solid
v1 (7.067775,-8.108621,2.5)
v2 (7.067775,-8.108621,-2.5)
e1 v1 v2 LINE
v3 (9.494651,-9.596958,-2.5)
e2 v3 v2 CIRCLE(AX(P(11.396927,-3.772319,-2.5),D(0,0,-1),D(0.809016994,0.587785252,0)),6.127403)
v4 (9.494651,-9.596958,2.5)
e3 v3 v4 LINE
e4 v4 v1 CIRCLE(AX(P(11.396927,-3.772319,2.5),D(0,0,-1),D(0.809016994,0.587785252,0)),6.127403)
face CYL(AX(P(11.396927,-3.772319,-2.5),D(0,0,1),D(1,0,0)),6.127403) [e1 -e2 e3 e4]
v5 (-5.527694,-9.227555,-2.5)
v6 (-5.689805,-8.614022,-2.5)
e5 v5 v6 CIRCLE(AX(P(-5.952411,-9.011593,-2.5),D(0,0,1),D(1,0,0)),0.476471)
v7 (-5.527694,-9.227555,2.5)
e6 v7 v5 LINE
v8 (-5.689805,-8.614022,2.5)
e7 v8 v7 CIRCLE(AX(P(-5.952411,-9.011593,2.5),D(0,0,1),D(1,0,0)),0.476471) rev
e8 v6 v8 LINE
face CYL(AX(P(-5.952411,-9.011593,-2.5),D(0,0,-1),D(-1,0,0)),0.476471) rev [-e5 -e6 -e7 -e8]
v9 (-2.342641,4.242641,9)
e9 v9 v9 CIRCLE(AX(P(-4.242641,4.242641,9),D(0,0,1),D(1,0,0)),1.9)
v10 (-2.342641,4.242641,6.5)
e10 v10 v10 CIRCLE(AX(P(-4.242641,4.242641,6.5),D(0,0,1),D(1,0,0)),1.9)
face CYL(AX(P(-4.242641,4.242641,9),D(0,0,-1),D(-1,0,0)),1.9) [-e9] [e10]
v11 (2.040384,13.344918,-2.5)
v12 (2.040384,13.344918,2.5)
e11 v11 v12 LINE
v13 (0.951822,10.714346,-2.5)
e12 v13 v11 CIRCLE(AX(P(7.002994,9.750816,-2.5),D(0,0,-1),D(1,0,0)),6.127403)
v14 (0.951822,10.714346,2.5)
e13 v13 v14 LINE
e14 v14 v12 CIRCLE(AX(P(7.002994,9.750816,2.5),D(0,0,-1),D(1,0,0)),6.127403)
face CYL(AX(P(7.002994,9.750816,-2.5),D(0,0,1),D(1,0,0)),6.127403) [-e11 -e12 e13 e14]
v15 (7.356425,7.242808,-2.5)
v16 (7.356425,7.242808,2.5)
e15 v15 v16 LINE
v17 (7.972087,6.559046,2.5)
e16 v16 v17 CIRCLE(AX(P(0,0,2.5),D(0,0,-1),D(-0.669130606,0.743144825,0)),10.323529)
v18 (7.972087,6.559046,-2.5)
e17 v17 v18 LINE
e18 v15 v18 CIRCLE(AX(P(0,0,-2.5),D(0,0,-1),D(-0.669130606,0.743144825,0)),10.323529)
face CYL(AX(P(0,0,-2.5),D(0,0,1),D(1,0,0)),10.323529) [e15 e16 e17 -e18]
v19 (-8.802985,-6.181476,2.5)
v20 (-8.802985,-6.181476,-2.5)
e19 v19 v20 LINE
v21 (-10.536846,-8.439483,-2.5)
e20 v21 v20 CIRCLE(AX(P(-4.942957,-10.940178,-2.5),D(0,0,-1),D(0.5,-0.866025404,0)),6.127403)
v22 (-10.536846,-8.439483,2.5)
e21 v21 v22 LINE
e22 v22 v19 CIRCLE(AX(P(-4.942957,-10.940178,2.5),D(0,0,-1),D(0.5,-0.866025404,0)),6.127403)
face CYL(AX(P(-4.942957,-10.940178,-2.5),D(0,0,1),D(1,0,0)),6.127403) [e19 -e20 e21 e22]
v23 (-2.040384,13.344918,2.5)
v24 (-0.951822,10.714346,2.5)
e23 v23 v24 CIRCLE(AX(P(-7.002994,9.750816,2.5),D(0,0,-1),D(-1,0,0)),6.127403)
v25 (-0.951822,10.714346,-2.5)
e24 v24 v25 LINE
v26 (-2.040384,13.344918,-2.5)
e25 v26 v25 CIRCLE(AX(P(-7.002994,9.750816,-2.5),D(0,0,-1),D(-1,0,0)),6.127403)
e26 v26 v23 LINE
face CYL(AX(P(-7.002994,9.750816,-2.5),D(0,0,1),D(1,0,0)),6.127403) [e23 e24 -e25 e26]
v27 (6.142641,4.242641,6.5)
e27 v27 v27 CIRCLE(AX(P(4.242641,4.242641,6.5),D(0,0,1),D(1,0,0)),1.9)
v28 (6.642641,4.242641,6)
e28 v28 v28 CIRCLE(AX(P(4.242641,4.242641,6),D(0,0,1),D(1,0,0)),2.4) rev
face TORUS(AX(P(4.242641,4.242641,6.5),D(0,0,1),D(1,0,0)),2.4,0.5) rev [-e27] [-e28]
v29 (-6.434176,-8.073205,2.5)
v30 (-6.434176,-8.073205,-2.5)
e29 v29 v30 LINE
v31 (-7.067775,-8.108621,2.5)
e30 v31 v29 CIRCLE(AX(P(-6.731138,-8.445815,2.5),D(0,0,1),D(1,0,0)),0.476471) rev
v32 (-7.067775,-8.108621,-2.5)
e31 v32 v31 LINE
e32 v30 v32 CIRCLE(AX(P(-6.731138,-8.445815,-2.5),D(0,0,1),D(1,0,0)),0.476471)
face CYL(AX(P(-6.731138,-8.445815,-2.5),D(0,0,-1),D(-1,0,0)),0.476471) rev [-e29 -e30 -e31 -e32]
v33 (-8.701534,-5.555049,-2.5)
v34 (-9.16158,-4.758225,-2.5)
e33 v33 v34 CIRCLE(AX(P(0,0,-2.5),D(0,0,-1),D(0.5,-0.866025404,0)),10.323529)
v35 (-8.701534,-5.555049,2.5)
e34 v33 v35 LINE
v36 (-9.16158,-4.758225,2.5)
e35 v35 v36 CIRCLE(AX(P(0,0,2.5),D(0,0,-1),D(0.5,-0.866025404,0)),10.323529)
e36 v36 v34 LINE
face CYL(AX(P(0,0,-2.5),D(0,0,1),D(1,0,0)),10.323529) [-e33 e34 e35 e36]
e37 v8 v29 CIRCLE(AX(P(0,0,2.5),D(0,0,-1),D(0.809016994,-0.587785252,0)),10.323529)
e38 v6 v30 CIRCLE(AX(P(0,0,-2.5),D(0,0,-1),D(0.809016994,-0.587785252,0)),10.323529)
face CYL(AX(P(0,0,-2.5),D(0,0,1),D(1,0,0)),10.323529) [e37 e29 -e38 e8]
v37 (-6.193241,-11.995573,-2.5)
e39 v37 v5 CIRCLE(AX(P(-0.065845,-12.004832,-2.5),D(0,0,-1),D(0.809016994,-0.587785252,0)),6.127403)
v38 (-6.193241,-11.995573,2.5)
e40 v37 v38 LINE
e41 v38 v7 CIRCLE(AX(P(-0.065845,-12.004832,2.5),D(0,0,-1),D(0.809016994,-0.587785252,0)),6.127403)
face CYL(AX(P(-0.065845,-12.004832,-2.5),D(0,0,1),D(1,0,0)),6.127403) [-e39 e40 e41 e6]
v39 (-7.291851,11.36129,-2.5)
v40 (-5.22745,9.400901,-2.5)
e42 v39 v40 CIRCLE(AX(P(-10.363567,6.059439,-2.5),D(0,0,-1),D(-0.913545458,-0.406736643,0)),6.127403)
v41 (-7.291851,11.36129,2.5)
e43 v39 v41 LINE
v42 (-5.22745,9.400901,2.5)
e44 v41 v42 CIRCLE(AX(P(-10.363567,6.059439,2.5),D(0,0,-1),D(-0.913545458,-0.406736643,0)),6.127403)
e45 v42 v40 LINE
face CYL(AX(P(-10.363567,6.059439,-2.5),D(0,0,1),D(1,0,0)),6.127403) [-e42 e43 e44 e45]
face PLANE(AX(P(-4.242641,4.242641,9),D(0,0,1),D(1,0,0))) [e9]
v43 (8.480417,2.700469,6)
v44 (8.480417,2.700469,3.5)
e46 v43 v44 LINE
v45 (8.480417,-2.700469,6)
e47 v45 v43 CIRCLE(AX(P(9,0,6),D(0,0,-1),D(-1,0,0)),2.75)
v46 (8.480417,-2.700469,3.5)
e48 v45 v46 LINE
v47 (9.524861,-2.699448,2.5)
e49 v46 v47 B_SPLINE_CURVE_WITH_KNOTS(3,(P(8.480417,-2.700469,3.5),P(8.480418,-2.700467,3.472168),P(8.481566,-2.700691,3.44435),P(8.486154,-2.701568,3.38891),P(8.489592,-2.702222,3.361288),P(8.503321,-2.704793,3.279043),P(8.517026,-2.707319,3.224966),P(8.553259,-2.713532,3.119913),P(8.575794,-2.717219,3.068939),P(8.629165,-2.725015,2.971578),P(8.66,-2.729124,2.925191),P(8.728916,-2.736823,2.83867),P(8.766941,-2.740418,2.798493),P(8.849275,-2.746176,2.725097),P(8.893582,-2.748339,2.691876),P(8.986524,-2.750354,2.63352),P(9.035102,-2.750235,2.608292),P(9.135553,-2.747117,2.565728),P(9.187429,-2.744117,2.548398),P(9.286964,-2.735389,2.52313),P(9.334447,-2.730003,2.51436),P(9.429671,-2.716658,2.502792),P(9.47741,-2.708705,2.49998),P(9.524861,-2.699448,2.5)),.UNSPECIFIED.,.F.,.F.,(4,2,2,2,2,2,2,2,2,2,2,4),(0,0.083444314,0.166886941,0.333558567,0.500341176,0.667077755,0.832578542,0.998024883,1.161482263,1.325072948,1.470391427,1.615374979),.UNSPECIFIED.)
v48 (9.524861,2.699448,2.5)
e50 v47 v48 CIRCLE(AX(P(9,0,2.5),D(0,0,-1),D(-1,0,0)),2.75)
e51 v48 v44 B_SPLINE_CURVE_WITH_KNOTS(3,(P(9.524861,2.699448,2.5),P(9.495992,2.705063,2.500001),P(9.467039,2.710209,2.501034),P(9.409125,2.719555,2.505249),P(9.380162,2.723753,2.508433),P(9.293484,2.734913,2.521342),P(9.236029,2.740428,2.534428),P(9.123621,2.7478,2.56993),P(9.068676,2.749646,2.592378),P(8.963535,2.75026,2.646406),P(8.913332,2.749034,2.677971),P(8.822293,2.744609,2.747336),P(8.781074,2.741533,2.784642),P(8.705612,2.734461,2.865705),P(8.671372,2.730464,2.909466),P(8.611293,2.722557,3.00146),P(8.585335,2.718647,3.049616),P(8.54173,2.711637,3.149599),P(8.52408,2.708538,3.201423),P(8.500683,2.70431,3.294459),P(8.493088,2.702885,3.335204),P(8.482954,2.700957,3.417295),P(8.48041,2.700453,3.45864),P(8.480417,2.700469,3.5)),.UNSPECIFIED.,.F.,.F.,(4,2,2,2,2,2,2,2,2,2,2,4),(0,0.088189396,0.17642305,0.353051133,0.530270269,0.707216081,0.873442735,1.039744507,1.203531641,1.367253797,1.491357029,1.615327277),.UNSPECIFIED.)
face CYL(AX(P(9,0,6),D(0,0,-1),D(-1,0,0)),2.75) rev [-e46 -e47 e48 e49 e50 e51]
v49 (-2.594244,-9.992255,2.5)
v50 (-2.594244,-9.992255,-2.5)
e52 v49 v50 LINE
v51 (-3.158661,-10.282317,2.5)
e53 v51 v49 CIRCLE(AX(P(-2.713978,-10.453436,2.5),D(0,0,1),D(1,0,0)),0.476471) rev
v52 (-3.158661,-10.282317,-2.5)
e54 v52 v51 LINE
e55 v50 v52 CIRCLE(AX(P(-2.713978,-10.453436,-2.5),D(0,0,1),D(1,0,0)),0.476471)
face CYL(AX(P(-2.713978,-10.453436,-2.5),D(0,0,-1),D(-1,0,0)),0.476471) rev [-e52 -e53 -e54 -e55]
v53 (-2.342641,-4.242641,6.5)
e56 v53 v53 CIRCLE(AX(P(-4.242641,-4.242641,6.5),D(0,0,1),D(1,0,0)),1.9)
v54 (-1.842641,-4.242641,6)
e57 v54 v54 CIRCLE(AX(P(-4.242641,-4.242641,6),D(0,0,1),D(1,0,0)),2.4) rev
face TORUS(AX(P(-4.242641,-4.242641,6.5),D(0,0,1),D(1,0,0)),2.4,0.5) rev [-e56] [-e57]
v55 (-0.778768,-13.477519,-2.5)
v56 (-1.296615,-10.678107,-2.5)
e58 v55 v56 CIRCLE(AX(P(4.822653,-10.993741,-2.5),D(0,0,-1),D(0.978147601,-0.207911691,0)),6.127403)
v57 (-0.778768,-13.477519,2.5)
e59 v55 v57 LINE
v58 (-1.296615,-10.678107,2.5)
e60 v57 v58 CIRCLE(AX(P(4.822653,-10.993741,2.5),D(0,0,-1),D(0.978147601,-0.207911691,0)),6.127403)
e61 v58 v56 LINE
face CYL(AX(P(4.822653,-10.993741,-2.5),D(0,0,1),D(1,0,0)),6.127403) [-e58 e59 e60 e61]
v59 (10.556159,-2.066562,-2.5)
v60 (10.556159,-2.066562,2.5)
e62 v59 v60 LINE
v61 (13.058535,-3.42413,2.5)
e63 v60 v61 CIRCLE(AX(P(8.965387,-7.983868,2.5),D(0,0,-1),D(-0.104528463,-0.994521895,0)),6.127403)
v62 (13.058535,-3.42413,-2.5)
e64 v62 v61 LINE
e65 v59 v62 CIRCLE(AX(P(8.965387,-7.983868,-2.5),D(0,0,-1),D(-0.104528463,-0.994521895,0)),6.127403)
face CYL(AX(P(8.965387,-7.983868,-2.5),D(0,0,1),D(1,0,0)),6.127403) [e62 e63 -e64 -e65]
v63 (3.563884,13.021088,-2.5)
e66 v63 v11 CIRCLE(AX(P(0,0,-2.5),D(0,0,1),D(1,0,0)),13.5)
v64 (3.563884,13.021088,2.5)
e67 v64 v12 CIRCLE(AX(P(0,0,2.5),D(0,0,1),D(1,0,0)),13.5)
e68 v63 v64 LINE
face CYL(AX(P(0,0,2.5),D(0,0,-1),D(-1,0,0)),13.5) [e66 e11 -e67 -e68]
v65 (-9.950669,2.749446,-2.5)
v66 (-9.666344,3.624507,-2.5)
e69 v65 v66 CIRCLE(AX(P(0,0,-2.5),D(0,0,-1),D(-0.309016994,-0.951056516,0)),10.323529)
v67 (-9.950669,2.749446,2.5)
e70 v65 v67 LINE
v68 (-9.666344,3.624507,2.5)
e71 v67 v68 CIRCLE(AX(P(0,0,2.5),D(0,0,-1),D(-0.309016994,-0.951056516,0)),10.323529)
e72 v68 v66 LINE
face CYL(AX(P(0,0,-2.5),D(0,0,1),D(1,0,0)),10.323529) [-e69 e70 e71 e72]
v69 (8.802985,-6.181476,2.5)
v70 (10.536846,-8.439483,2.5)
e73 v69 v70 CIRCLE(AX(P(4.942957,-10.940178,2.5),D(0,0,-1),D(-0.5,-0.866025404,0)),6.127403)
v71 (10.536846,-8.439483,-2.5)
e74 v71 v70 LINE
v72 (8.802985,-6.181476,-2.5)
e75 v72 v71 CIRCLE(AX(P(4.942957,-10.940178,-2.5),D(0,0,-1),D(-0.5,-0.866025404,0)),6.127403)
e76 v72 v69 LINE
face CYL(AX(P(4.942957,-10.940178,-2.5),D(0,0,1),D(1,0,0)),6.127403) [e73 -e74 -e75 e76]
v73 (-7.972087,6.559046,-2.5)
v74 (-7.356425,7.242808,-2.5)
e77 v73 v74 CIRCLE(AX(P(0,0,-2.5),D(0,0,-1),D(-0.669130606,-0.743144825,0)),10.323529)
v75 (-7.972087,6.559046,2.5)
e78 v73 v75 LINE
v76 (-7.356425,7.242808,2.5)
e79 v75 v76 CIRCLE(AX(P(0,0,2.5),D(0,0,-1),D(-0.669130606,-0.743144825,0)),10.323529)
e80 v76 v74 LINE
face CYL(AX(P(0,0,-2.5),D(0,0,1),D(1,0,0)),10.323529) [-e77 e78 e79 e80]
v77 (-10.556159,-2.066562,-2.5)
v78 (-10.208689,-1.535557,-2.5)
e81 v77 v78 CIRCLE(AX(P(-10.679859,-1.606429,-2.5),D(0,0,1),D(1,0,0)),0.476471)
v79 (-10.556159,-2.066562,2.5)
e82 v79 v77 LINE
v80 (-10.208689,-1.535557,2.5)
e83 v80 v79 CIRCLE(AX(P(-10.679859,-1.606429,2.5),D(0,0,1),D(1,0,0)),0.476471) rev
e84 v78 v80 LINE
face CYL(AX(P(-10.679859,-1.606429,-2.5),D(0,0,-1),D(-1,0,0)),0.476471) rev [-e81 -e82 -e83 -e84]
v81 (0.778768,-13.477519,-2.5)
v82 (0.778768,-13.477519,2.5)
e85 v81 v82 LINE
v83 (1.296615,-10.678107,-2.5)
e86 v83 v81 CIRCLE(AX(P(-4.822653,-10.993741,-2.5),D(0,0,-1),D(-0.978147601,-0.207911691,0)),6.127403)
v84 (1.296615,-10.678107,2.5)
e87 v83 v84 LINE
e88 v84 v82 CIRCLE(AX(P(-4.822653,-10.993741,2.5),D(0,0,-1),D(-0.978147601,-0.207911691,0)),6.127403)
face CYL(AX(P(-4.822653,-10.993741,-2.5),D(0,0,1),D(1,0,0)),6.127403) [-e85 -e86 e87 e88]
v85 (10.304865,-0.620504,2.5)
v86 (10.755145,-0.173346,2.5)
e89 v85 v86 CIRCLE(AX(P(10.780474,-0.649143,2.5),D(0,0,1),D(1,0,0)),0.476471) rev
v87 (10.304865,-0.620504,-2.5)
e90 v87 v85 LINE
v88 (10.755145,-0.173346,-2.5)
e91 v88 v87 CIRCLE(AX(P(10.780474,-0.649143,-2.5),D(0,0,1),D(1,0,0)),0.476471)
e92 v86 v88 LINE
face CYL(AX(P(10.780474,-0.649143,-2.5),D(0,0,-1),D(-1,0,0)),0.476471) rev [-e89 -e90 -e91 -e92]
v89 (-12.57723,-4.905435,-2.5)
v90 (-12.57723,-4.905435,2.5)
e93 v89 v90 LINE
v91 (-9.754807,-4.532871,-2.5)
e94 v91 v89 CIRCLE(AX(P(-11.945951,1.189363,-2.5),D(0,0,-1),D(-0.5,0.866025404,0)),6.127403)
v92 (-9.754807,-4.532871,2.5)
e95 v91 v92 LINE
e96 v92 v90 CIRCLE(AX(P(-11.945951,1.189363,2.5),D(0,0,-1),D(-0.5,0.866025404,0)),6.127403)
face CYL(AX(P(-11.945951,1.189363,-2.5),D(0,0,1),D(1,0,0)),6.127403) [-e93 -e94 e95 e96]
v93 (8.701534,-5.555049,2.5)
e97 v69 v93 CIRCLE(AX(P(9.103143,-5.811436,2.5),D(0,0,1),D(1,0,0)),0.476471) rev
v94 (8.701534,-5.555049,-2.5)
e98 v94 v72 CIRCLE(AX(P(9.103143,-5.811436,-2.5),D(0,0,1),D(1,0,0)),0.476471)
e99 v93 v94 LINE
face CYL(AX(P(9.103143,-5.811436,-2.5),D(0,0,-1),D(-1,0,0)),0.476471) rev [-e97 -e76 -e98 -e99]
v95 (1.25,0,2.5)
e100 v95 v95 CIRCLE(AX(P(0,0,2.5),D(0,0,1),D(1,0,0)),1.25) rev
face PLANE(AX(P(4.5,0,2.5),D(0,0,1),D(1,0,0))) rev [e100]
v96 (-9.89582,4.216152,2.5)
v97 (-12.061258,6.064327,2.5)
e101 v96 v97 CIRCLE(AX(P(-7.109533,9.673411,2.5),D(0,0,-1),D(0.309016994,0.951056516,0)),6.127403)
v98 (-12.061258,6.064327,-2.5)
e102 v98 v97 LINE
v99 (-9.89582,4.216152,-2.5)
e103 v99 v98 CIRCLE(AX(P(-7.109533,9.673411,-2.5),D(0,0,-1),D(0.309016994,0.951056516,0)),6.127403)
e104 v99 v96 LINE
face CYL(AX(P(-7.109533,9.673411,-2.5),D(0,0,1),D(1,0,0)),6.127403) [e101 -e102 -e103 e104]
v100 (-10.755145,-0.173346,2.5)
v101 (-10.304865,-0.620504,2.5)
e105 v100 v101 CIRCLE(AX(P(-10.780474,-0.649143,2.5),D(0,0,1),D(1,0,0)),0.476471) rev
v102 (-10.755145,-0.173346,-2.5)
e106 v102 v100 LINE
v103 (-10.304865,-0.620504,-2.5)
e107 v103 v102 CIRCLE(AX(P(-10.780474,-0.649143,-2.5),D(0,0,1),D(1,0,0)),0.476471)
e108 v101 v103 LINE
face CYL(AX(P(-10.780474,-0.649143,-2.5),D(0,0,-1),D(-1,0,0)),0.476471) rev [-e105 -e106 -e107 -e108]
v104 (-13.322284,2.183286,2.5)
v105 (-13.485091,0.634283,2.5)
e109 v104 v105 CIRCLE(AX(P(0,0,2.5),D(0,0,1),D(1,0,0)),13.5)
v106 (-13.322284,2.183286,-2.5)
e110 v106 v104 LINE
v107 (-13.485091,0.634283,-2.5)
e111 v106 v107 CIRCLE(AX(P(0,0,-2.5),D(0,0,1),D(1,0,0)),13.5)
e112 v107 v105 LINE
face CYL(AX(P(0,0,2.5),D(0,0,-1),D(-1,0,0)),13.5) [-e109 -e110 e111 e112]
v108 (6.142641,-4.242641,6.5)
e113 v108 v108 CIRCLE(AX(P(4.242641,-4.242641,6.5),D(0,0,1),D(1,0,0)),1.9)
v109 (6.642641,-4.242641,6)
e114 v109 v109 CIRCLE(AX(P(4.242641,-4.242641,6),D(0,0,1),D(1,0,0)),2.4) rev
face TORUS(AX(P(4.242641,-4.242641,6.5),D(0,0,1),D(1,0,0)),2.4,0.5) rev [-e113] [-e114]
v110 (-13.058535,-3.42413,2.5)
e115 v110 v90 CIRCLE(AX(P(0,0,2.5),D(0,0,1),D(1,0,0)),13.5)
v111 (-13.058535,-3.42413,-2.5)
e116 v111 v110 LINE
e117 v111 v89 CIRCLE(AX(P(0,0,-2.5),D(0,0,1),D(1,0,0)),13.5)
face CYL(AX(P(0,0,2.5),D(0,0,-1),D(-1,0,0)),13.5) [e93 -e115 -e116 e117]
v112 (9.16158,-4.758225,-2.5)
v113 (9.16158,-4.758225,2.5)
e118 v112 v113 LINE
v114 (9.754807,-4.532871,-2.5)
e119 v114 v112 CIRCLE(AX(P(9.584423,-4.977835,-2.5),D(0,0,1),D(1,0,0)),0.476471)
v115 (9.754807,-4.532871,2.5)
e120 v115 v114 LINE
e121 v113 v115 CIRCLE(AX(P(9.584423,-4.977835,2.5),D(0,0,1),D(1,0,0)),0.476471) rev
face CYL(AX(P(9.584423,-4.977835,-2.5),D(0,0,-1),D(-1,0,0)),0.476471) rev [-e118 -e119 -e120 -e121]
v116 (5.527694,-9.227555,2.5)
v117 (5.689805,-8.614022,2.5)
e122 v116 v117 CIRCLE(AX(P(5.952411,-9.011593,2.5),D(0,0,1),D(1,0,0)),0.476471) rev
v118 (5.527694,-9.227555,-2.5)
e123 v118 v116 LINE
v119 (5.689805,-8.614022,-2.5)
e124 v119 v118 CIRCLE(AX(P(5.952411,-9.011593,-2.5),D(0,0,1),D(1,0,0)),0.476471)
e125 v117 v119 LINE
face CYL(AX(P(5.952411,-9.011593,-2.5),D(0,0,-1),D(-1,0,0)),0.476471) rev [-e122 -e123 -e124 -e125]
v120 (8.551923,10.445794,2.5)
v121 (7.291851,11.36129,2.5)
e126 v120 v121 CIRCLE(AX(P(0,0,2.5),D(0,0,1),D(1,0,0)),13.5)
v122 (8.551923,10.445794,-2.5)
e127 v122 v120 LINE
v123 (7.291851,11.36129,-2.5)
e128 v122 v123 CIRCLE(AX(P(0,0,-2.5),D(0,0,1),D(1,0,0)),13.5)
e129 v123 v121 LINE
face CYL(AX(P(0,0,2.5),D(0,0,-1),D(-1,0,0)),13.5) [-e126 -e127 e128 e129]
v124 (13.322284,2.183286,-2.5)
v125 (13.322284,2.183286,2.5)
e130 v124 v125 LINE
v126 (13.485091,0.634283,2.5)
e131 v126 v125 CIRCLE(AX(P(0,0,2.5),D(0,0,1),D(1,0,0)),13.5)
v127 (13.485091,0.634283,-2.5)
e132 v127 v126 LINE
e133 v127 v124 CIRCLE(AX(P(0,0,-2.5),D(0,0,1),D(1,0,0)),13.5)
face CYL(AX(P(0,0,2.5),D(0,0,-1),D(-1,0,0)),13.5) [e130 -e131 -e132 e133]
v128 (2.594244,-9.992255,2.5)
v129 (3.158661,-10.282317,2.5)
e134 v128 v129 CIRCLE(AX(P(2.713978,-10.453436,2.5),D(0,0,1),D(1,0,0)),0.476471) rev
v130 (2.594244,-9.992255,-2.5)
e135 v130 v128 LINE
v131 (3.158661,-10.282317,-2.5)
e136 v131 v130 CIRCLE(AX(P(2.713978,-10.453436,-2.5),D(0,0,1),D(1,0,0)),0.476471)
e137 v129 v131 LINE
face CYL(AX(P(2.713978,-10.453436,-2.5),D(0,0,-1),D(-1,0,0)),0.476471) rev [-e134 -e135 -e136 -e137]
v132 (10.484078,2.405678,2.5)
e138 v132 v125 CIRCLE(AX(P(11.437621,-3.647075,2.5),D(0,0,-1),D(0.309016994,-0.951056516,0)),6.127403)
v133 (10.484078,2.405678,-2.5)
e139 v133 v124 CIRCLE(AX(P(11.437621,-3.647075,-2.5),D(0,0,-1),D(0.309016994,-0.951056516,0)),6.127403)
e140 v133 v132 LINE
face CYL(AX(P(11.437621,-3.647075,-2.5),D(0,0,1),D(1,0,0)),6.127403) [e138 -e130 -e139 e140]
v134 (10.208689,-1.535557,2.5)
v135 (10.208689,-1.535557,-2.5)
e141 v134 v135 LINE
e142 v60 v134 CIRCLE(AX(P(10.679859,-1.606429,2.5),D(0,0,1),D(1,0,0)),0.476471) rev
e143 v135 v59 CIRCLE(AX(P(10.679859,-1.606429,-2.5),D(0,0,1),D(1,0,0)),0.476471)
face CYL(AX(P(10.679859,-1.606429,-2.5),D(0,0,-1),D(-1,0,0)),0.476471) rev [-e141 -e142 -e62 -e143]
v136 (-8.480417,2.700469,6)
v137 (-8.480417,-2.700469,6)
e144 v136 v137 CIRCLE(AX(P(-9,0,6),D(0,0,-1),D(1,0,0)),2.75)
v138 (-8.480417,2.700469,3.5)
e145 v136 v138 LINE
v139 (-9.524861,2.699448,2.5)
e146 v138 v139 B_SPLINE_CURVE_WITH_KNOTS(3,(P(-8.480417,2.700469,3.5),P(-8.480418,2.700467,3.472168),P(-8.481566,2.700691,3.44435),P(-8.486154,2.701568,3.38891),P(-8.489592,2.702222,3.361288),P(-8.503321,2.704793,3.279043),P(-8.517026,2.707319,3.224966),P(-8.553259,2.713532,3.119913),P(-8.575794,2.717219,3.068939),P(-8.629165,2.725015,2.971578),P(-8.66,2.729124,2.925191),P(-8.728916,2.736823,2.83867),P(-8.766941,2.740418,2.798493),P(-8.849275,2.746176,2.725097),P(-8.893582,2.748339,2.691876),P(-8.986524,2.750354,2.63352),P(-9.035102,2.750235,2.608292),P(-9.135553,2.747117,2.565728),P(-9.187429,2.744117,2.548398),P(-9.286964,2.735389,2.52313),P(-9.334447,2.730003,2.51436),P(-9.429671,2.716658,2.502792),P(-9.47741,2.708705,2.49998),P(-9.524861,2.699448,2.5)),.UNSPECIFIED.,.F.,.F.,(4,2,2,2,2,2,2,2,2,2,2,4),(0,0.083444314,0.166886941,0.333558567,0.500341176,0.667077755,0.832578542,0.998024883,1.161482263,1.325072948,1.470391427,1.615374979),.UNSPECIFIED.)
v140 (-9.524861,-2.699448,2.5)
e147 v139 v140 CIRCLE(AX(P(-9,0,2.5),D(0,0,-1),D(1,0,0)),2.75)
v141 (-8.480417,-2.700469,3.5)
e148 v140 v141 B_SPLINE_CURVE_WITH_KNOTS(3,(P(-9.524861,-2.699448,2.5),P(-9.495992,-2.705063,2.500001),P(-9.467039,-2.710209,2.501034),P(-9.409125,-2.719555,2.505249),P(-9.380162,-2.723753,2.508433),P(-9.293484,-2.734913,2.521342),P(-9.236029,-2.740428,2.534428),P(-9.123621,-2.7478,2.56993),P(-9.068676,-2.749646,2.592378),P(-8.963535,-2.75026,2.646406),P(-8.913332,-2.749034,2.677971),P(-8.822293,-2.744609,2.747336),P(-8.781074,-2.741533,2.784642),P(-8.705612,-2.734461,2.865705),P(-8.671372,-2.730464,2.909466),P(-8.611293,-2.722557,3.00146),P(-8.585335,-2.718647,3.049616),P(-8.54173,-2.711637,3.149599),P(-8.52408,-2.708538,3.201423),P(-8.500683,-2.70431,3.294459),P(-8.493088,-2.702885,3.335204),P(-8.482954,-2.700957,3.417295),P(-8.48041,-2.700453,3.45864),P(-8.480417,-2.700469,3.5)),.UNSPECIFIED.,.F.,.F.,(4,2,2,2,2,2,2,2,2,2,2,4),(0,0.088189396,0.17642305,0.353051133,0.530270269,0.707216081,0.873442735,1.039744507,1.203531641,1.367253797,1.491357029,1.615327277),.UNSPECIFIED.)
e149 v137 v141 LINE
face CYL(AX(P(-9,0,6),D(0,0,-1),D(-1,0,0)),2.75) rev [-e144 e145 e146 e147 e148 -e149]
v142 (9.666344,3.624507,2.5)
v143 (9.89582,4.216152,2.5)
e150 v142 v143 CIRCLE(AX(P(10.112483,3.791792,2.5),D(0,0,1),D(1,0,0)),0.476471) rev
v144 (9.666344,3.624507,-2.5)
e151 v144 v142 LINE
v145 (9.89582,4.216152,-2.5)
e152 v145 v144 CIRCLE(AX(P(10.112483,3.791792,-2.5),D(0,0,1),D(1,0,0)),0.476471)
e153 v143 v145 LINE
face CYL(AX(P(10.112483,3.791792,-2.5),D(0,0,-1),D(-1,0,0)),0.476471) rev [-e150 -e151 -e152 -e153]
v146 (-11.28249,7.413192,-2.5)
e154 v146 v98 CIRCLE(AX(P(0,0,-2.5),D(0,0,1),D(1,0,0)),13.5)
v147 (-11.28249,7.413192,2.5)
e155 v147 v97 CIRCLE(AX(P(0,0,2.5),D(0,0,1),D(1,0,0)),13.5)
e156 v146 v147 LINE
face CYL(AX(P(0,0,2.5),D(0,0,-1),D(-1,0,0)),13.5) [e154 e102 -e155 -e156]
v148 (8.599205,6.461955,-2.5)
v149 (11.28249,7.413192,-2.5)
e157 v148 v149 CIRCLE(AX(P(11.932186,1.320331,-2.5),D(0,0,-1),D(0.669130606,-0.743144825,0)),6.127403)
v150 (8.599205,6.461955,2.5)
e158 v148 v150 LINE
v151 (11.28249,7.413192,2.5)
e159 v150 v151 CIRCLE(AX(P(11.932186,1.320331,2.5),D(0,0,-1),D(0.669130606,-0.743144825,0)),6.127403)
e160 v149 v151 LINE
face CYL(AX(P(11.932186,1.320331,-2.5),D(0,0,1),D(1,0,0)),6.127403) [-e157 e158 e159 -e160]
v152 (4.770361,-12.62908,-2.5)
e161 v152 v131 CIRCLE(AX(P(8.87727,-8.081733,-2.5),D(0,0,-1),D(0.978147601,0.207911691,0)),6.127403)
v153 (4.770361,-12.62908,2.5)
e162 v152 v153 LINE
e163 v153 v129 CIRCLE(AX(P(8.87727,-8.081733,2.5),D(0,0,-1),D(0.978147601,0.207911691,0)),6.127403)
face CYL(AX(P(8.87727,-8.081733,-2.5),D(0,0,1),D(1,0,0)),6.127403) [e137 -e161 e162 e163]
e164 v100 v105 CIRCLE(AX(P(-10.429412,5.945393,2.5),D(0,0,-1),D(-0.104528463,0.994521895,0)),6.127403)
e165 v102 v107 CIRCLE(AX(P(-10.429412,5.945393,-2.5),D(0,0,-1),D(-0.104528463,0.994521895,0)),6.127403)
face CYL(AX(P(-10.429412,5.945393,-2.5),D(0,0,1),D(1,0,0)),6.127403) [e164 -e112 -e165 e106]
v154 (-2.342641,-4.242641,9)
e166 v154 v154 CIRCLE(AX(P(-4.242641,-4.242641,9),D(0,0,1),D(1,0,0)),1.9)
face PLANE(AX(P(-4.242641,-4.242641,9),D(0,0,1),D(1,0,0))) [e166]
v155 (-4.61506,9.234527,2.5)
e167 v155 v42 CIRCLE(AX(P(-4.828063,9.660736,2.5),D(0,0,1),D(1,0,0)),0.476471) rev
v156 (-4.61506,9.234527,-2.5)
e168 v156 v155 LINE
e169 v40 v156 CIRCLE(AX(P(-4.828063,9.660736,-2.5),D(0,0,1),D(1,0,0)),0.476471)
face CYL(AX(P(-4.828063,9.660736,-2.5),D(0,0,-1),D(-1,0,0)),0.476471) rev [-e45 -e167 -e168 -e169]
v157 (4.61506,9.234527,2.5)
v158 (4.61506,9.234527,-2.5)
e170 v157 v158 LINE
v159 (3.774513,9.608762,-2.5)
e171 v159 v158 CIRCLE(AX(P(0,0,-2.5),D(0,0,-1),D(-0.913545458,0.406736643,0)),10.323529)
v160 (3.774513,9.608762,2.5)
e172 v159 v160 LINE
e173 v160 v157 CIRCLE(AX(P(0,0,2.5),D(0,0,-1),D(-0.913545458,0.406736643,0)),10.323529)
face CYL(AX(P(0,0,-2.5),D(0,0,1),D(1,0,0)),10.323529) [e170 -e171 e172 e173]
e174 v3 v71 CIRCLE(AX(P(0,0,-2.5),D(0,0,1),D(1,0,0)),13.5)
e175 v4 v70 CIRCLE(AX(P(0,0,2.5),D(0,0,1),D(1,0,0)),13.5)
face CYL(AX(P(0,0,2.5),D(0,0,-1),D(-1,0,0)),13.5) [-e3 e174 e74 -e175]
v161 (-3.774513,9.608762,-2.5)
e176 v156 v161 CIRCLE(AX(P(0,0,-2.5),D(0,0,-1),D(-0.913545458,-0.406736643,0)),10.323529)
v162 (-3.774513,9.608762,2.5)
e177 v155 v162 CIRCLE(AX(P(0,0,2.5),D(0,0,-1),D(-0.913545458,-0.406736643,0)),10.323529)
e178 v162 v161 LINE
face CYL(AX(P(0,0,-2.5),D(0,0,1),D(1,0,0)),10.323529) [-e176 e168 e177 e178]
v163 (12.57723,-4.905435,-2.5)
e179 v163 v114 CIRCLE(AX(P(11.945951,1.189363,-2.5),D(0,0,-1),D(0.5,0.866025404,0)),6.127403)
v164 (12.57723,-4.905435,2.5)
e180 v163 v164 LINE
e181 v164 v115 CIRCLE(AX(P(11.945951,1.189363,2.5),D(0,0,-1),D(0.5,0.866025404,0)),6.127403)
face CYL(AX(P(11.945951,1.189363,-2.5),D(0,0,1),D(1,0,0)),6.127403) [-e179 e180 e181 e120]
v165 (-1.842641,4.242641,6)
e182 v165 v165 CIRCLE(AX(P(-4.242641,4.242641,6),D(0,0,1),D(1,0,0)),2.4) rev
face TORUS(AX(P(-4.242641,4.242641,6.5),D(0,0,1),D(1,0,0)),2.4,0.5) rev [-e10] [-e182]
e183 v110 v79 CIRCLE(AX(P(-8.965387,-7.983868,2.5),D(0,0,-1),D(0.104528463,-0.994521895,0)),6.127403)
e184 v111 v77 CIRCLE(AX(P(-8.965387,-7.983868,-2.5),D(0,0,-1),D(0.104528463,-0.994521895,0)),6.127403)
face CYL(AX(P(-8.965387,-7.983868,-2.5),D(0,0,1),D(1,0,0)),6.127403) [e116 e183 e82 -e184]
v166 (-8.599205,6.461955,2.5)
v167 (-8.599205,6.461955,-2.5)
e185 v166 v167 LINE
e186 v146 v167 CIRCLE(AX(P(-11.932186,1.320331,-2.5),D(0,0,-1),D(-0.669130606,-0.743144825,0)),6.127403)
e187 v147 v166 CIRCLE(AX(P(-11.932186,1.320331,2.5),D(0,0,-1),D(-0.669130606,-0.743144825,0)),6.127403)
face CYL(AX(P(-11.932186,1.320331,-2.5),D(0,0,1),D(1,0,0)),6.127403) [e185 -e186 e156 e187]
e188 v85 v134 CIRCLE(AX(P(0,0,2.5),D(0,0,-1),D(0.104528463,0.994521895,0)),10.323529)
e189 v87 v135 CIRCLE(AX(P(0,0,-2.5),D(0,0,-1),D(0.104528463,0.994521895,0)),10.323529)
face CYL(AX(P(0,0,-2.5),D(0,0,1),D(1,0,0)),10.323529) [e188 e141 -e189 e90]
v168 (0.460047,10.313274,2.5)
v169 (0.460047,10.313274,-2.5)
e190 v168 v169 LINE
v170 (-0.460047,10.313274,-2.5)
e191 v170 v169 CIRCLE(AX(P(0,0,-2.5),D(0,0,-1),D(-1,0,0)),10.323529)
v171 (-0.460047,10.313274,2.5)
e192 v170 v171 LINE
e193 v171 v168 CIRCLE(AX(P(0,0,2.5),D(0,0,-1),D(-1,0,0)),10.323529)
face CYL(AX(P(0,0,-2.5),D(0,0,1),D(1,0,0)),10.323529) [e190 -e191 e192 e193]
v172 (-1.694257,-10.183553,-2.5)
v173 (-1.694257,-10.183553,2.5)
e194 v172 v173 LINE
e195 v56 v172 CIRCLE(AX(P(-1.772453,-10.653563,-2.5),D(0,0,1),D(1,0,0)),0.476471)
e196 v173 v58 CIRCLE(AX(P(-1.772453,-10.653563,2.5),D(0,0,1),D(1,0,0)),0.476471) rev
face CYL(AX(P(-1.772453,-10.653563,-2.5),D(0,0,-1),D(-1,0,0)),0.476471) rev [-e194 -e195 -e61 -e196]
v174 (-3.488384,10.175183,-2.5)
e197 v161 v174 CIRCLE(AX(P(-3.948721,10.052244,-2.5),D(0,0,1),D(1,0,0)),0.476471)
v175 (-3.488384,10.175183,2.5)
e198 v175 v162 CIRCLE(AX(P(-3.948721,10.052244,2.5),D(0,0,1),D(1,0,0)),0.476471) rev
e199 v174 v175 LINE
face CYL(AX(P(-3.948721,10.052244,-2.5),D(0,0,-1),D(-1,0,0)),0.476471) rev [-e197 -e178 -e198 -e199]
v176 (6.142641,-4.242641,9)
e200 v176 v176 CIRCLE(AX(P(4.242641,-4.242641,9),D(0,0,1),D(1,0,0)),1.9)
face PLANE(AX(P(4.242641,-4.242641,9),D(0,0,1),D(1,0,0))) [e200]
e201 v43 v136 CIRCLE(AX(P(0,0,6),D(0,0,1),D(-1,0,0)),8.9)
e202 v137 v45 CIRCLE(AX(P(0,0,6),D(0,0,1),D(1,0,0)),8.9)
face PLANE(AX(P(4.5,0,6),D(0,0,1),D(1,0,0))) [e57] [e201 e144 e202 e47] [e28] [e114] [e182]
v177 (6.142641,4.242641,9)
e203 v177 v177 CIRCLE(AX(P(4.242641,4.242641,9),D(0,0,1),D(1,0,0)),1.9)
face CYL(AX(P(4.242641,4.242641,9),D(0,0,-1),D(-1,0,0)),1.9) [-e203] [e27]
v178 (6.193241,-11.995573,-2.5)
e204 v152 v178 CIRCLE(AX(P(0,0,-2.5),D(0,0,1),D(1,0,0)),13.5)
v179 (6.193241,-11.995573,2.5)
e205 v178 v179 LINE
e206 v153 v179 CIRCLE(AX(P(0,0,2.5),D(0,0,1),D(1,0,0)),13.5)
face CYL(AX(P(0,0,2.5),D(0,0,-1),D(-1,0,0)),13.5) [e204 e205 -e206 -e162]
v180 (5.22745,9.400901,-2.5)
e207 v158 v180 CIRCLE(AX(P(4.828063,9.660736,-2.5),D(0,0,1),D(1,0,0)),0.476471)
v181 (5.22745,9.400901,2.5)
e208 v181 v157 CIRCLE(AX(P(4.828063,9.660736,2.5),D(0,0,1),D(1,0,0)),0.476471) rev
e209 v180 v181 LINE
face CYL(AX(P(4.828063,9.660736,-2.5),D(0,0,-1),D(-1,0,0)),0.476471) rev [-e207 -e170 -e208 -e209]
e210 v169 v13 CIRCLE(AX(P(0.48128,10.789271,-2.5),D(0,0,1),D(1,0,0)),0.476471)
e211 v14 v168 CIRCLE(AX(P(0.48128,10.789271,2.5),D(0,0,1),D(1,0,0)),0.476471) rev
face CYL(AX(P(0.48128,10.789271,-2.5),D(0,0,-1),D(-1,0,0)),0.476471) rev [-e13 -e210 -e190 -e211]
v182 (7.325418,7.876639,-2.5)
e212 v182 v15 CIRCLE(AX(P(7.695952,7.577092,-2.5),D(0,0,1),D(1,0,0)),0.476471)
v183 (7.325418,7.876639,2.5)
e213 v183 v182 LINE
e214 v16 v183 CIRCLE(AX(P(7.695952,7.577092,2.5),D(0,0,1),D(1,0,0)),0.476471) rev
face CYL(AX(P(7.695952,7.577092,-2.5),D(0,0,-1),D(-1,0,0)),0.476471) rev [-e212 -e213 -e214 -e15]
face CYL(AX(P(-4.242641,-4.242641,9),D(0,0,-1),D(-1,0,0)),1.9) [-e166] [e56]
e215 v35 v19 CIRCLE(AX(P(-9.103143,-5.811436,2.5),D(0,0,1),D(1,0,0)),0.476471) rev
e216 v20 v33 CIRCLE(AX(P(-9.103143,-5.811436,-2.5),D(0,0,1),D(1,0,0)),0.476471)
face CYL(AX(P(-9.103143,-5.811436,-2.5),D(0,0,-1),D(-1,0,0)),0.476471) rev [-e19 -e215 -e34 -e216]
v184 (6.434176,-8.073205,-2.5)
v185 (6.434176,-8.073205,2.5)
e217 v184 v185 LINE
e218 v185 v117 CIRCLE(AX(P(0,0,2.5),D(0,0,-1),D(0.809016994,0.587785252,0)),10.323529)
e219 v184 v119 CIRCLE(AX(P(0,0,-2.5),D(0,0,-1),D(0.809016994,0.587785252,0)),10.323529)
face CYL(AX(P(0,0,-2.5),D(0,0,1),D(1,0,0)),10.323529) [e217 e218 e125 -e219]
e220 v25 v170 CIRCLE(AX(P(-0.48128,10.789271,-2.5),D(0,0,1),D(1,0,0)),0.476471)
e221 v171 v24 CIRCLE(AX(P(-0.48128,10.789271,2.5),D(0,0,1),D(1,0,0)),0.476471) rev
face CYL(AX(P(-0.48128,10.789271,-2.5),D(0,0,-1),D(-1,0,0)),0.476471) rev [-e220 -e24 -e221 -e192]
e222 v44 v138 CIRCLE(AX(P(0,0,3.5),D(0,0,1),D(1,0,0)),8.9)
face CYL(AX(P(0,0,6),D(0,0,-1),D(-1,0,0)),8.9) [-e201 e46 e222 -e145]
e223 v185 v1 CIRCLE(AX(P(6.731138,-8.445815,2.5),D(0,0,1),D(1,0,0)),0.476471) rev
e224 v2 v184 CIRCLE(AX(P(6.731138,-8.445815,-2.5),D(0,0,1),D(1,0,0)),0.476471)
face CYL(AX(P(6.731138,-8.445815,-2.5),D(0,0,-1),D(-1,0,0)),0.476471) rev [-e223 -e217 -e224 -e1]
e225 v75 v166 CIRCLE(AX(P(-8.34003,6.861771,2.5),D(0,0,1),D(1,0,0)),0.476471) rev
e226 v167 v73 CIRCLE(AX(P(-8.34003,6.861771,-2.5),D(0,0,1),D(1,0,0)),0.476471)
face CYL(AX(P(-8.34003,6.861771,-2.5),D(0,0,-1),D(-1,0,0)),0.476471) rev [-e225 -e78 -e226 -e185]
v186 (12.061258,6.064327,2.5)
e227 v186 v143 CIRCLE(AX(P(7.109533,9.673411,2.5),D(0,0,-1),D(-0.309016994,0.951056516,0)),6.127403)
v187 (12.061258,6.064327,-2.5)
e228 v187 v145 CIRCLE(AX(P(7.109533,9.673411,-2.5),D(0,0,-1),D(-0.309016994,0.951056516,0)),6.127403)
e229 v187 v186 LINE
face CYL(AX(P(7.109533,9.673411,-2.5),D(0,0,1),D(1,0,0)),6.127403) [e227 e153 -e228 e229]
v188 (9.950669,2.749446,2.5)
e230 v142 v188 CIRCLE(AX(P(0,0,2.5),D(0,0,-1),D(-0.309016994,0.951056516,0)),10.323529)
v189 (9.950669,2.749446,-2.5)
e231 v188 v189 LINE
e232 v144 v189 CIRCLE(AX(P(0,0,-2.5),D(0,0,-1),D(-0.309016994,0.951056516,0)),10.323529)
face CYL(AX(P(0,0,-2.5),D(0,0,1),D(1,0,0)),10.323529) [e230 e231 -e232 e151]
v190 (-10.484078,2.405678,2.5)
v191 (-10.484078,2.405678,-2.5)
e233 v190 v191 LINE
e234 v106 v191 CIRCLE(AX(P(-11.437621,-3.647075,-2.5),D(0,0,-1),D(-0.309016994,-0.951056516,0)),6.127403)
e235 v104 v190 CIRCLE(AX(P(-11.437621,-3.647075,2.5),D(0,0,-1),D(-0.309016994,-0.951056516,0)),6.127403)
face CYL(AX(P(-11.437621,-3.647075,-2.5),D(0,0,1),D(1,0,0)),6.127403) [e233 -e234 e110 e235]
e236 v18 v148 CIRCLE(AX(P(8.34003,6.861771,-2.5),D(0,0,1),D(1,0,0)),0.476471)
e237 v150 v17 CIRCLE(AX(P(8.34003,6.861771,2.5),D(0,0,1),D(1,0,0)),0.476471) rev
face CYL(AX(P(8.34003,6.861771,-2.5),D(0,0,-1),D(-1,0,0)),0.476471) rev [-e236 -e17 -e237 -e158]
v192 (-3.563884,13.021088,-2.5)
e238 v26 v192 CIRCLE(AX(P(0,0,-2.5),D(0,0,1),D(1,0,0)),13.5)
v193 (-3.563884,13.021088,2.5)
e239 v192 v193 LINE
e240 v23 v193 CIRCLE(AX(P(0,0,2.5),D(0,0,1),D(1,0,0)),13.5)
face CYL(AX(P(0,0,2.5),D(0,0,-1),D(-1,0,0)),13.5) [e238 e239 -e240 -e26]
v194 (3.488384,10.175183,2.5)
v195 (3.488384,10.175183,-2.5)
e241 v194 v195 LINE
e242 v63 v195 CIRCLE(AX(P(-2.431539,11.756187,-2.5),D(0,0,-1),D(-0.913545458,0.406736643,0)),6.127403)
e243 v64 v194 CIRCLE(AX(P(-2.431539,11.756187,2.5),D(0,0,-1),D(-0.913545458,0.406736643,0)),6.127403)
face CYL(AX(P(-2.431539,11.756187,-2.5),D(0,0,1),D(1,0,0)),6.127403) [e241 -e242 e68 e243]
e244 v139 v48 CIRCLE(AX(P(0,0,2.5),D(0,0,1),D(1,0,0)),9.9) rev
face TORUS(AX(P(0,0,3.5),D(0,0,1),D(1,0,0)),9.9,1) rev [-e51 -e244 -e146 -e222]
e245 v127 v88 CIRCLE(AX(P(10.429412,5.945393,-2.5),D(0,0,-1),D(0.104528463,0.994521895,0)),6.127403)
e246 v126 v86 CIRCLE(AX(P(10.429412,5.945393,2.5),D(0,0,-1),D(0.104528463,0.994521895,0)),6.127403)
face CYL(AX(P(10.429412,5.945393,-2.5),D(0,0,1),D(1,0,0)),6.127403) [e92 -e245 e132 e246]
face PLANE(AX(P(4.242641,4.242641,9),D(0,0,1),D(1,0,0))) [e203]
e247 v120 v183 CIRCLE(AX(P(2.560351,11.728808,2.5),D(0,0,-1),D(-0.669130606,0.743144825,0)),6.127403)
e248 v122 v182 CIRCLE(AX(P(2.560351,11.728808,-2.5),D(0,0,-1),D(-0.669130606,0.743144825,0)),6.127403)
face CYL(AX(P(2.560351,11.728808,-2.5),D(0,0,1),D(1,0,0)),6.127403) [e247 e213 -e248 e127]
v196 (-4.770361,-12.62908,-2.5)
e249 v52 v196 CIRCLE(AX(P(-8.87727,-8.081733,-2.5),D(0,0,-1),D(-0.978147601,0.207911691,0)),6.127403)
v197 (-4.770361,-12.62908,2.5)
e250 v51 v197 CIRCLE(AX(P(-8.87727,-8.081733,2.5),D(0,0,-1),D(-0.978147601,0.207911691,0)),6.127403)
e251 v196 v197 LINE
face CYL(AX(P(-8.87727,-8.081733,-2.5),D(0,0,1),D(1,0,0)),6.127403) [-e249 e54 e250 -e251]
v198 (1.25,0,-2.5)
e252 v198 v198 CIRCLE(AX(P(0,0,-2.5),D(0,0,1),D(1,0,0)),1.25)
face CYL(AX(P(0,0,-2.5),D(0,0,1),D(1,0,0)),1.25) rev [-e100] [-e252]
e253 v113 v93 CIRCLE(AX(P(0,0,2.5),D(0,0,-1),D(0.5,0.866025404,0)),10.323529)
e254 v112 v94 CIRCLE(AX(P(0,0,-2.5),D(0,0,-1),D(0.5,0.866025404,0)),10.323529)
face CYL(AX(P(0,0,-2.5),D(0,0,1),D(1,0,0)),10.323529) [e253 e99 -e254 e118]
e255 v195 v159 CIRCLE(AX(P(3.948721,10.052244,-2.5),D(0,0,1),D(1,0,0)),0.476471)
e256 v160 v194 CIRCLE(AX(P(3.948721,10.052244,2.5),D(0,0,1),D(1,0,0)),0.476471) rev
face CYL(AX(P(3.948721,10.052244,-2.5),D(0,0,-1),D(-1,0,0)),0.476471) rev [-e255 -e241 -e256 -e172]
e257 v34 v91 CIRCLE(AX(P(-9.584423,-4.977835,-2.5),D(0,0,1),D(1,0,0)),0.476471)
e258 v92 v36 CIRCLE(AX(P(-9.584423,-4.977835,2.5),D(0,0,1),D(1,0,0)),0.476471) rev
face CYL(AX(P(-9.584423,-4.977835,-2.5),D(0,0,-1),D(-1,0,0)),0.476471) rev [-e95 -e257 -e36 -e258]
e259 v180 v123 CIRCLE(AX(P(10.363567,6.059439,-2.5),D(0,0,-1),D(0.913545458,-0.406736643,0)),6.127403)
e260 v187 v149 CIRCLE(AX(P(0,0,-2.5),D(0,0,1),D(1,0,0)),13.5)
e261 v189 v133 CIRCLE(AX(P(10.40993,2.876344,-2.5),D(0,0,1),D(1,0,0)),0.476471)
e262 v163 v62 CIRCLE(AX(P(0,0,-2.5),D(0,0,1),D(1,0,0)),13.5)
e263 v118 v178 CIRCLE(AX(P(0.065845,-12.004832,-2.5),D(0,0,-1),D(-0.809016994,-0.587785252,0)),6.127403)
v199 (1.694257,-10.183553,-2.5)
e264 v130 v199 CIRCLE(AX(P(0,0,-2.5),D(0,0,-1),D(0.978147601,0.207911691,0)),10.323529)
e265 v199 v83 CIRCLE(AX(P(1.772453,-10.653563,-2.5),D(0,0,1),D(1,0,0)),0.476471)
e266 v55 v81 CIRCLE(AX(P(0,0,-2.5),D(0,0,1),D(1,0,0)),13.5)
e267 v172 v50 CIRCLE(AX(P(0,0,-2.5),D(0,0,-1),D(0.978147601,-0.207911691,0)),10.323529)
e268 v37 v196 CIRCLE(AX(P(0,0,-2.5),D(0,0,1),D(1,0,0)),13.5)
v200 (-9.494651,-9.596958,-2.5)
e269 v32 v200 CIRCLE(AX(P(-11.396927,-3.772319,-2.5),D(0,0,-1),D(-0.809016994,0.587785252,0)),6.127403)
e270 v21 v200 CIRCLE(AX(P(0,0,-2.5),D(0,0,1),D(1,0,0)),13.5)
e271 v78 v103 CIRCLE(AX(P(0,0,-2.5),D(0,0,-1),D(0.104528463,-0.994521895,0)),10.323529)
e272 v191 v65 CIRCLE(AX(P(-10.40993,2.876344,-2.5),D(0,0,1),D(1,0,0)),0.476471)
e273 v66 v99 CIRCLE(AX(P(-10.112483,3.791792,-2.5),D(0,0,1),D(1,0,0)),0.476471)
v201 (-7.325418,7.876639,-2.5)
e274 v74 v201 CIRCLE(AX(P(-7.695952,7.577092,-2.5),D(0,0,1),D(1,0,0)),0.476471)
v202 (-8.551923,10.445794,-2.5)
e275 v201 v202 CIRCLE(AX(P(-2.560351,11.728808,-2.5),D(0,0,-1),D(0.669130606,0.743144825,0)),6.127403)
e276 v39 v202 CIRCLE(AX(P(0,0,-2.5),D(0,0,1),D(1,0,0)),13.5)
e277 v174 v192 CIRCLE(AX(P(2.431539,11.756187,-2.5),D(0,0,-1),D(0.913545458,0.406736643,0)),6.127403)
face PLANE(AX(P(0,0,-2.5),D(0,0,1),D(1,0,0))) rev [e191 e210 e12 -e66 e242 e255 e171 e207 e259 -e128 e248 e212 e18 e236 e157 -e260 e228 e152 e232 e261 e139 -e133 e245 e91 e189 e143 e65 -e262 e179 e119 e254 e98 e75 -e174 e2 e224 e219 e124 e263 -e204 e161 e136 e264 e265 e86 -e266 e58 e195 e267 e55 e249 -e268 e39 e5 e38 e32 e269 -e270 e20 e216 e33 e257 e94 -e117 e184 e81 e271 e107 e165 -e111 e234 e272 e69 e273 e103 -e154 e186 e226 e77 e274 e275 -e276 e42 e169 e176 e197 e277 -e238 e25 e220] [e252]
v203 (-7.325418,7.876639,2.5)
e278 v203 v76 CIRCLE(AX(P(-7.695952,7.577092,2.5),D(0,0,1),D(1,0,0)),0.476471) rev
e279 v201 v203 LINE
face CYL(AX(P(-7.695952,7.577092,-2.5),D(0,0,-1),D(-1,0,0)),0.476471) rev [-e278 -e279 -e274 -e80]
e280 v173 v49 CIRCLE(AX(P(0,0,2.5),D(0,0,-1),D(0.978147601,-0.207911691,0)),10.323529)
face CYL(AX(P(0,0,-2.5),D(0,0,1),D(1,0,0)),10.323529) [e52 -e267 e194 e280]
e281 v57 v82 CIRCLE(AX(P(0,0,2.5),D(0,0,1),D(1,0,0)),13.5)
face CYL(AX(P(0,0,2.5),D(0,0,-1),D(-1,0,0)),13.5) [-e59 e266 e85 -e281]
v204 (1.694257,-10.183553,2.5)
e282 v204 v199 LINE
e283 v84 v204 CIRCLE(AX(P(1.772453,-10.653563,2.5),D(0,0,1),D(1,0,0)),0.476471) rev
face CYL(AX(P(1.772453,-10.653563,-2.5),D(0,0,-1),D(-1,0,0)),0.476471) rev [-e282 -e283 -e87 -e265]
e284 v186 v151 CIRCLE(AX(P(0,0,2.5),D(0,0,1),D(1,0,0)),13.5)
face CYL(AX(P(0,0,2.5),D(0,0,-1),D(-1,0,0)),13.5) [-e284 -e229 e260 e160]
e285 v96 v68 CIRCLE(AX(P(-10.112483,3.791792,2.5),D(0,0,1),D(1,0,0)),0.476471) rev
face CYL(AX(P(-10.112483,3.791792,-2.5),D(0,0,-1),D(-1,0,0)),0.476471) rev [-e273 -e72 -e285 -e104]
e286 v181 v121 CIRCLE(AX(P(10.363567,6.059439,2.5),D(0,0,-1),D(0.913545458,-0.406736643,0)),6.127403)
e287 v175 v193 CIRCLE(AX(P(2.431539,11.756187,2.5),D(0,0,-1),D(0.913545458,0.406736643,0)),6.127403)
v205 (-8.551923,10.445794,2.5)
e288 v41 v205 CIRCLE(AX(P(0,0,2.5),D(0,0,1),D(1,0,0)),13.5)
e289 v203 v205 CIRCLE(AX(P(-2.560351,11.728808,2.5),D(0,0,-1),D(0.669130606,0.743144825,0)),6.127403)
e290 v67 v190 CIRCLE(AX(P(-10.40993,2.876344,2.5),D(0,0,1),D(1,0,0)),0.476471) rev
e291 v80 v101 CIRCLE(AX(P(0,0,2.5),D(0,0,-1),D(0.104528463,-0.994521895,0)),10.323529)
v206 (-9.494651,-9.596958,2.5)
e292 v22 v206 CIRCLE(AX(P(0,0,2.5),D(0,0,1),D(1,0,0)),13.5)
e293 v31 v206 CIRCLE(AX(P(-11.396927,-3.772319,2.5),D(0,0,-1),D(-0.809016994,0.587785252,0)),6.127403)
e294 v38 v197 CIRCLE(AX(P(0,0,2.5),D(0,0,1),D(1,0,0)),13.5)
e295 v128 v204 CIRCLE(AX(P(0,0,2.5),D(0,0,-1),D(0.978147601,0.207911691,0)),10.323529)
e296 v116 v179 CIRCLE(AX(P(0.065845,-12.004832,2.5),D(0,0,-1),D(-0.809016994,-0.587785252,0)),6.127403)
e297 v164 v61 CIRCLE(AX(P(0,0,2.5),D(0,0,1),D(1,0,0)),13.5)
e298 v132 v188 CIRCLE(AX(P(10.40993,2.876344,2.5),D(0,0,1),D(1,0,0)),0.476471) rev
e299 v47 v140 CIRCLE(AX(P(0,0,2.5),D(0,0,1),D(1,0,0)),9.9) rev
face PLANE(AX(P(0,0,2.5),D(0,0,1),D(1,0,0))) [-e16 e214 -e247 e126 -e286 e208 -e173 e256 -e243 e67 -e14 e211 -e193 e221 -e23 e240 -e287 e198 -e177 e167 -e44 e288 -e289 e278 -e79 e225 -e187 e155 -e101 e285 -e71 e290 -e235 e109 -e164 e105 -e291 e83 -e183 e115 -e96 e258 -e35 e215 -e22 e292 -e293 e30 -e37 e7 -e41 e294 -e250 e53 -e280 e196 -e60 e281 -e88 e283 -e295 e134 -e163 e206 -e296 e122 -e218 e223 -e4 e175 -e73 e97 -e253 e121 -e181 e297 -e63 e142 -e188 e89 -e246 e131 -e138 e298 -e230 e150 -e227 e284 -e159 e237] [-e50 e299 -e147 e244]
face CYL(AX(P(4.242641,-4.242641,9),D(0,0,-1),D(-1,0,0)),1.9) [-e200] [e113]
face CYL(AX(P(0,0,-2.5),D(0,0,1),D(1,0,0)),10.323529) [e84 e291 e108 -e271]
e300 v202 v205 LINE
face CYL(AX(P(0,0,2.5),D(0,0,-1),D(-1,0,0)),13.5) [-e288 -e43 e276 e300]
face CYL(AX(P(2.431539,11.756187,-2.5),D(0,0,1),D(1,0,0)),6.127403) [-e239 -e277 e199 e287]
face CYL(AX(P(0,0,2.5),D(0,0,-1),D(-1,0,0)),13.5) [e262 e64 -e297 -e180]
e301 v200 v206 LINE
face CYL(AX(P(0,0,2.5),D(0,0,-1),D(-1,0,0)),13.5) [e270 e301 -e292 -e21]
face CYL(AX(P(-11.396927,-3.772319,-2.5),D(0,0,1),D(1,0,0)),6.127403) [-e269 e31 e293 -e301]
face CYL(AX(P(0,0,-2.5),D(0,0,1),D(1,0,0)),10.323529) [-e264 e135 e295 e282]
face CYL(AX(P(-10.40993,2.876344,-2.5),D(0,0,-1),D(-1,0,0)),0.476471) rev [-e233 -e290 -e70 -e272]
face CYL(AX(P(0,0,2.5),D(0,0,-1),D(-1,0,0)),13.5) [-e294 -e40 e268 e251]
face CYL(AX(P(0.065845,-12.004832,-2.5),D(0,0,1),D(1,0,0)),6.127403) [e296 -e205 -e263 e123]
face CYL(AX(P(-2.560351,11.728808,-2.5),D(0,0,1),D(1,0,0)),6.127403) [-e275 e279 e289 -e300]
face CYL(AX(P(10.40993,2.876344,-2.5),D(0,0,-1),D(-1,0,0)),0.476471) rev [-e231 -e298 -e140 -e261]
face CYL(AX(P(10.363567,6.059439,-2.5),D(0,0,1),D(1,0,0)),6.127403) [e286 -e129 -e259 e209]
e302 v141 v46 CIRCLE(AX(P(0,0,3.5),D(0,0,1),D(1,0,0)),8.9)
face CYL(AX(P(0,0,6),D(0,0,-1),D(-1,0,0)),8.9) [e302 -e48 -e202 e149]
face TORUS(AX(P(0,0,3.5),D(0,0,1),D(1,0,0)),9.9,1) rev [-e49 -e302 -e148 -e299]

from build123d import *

# Parameters (mm, degrees)
SKETCH1_R                      = 13.5
BOSS_EXTRUDE1_DEPTH            = 2.5
CUT_EXTRUDE1_DEPTH             = 20.254869514
FILLET2_R                      = 0.476470588
CIRPATTERN1_COUNT              = 15
FILLET2_OF_CIRPATTERN1_R       = 0.476470588
THROUGH_CENTER_HOLE_DEPTH      = 20.244419741
THROUGH_CENTER_HOLE_DEPTH_BACK = 20.244419741
SKETCH5_R                      = 1.25
BOSS_EXTRUDE2_DEPTH            = 3.5
SKETCH7_R                      = 1.9
BOSS_EXTRUDE3_DEPTH            = 3
FILLET3_R                      = 1
FILLET4_R                      = 0.5


with BuildPart() as part:
    # Sketch1 → Boss-Extrude1 (new, symmetric)
    with BuildSketch(Plane.XY):
        Circle(SKETCH1_R)
    extrude(amount=BOSS_EXTRUDE1_DEPTH, both=True)

    # Sketch3 → Cut-Extrude1 (cut, symmetric)
    with BuildSketch(Plane.XY):
        with BuildLine():
            ThreePointArc((-2.040384037, 13.344917871), (-1.26191316, 11.892090906), (-0.898861073, 10.284323424))
            ThreePointArc((-0.898861073, 10.284323424), (0, 10.323529412), (0.898861073, 10.284323424))
            ThreePointArc((0.898861073, 10.284323424), (1.26191316, 11.892090906), (2.040384037, 13.344917871))
            ThreePointArc((2.040384037, 13.344917871), (0, 13.5), (-2.040384037, 13.344917871))
        make_face()
    cut_extrude1 = extrude(amount=CUT_EXTRUDE1_DEPTH, both=True, mode=Mode.SUBTRACT)

    # Fillet2
    fillet2_edges = [part.edges().sort_by_distance(p)[0] for p in [
        (0.898861073, 10.284323424, 0),
        (-0.898861073, 10.284323424, 0),
    ]]
    fillet(fillet2_edges, radius=FILLET2_R)

    # CirPattern1: Cut-Extrude1 ×15 about axis
    cirpattern1_axis = Axis((0, 0, 0), (0, 0, 1))
    for i in range(1, CIRPATTERN1_COUNT):
        add(cut_extrude1.rotate(cirpattern1_axis, i * 360 / CIRPATTERN1_COUNT), mode=Mode.SUBTRACT)

    # Fillet2 of CirPattern1
    fillet2_of_cirpattern1_edges = [part.edges().sort_by_distance(p)[0] for p in [
        (-3.361860735, 9.760796684, 0),
        (-5.004161636, 9.029597213, 0),
        (-7.041286281, 7.549539524, 0),
        (-8.244197191, 6.213571613, 0),
        (-9.503209461, 4.032898395, 0),
        (-10.058736155, 2.323163032, 0),
        (-10.321941391, -0.181067505, 0),
        (-10.134028257, -1.968941542, 0),
        (-9.355915883, -4.363725188, 0),
        (-8.457054809, -5.920598236, 0),
        (-6.772167522, -7.791855143, 0),
        (-5.317779754, -8.848529708, 0),
        (-3.017449874, -9.872702557, 0),
        (-1.25901227, -10.246470008, 0),
        (1.25901227, -10.246470008, 0),
        (3.017449874, -9.872702557, 0),
        (5.317779754, -8.848529708, 0),
        (6.772167522, -7.791855143, 0),
        (8.457054809, -5.920598236, 0),
        (9.355915883, -4.363725188, 0),
        (10.134028257, -1.968941542, 0),
        (10.321941391, -0.181067505, 0),
        (10.058736155, 2.323163032, 0),
        (9.503209461, 4.032898395, 0),
        (8.244197191, 6.213571613, 0),
        (7.041286281, 7.549539524, 0),
        (5.004161636, 9.029597213, 0),
        (3.361860735, 9.760796684, 0),
    ]]
    fillet(fillet2_of_cirpattern1_edges, radius=FILLET2_OF_CIRPATTERN1_R)

    # Sketch5 → Through_Center_Hole (cut, two sides: drawn at the far end of the back side and taken through both)
    with BuildSketch(Plane.XY.offset(-THROUGH_CENTER_HOLE_DEPTH_BACK)):
        Circle(SKETCH5_R)
    extrude(amount=THROUGH_CENTER_HOLE_DEPTH + THROUGH_CENTER_HOLE_DEPTH_BACK, mode=Mode.SUBTRACT)

    # Sketch6 → Boss-Extrude2 (add)
    with BuildSketch(Plane.XY.offset(2.5)):
        with BuildLine():
            ThreePointArc((-8.480416667, -2.700469063), (-6.25, 0), (-8.480416667, 2.700469063))
            ThreePointArc((-8.480416667, 2.700469063), (0, 8.9), (8.480416667, 2.700469063))
            ThreePointArc((8.480416667, 2.700469063), (6.25, 0), (8.480416667, -2.700469063))
            ThreePointArc((8.480416667, -2.700469063), (0, -8.9), (-8.480416667, -2.700469063))
        make_face()
    extrude(amount=BOSS_EXTRUDE2_DEPTH)

    # Sketch7 → Boss-Extrude3 (add)
    with BuildSketch(Plane.XY.offset(6)):
        with Locations((-4.242640687, 4.242640687)):
            Circle(SKETCH7_R)
        with Locations((4.242640687, 4.242640687)):
            Circle(SKETCH7_R)
        with Locations((4.242640687, -4.242640687)):
            Circle(SKETCH7_R)
        with Locations((-4.242640687, -4.242640687)):
            Circle(SKETCH7_R)
    extrude(amount=BOSS_EXTRUDE3_DEPTH)

    # Fillet3
    # the kernel refuses this fillet: 1 mm, written as the material it adds along each edge
    with BuildSketch(Plane(origin=(0, 0, 2.5), x_dir=(0.9996330098529925, -0.02708958494047193, 0), z_dir=(0.02708958494047193, 0.9996330098529925, 0))) as fillet3_piece_1_section:
        with BuildLine():
            CenterArc((8.9 + FILLET3_R, -FILLET3_R), FILLET3_R, 90, 90)
            Line((8.9, -FILLET3_R), (8.9, 0))
            Line((8.9, 0), (8.9 + FILLET3_R, 0))
        make_face()
    fillet3_piece_1 = revolve(axis=Axis((0, 0, 2.5), (0, 0, -1)), revolution_arc=176.895382431, mode=Mode.PRIVATE)
    fillet3_piece_1 = fillet3_piece_1 - Plane(origin=(9, 0, 2.780116287), x_dir=(-0.18893939393939513, 0.9819887501482969, 0), z_dir=(0, 0, -1)) * Cylinder(2.75, 40, mode=Mode.PRIVATE)
    fillet3_piece_1 = fillet3_piece_1 - Plane(origin=(-9, 0, 2.780116287), x_dir=(0.18893939393939513, -0.9819887501482969, 0), z_dir=(0, 0, -1)) * Cylinder(2.75, 40, mode=Mode.PRIVATE)
    add(fillet3_piece_1)
    with BuildSketch(Plane(origin=(0, 0, 2.5), x_dir=(-0.9996330098529925, 0.027089584940471288, 0), z_dir=(-0.027089584940471288, -0.9996330098529925, 0))) as fillet3_piece_2_section:
        with BuildLine():
            CenterArc((8.9 + FILLET3_R, -FILLET3_R), FILLET3_R, 90, 90)
            Line((8.9, -FILLET3_R), (8.9, 0))
            Line((8.9, 0), (8.9 + FILLET3_R, 0))
        make_face()
    fillet3_piece_2 = revolve(axis=Axis((0, 0, 2.5), (0, 0, -1)), revolution_arc=176.895382431, mode=Mode.PRIVATE)
    fillet3_piece_2 = fillet3_piece_2 - Plane(origin=(9, 0, 2.780116287), x_dir=(-0.18893939393939513, 0.9819887501482969, 0), z_dir=(0, 0, -1)) * Cylinder(2.75, 40, mode=Mode.PRIVATE)
    fillet3_piece_2 = fillet3_piece_2 - Plane(origin=(-9, 0, 2.780116287), x_dir=(0.18893939393939513, -0.9819887501482969, 0), z_dir=(0, 0, -1)) * Cylinder(2.75, 40, mode=Mode.PRIVATE)
    add(fillet3_piece_2)

    # Fillet4
    fillet4_edges = [part.edges().sort_by_distance(p)[0] for p in [
        (-6.142640687, 4.242640687, 6),
        (2.342640687, 4.242640687, 6),
        (2.342640687, -4.242640687, 6),
        (-6.142640687, -4.242640687, 6),
    ]]
    fillet(fillet4_edges, radius=FILLET4_R)


solid = part.part
